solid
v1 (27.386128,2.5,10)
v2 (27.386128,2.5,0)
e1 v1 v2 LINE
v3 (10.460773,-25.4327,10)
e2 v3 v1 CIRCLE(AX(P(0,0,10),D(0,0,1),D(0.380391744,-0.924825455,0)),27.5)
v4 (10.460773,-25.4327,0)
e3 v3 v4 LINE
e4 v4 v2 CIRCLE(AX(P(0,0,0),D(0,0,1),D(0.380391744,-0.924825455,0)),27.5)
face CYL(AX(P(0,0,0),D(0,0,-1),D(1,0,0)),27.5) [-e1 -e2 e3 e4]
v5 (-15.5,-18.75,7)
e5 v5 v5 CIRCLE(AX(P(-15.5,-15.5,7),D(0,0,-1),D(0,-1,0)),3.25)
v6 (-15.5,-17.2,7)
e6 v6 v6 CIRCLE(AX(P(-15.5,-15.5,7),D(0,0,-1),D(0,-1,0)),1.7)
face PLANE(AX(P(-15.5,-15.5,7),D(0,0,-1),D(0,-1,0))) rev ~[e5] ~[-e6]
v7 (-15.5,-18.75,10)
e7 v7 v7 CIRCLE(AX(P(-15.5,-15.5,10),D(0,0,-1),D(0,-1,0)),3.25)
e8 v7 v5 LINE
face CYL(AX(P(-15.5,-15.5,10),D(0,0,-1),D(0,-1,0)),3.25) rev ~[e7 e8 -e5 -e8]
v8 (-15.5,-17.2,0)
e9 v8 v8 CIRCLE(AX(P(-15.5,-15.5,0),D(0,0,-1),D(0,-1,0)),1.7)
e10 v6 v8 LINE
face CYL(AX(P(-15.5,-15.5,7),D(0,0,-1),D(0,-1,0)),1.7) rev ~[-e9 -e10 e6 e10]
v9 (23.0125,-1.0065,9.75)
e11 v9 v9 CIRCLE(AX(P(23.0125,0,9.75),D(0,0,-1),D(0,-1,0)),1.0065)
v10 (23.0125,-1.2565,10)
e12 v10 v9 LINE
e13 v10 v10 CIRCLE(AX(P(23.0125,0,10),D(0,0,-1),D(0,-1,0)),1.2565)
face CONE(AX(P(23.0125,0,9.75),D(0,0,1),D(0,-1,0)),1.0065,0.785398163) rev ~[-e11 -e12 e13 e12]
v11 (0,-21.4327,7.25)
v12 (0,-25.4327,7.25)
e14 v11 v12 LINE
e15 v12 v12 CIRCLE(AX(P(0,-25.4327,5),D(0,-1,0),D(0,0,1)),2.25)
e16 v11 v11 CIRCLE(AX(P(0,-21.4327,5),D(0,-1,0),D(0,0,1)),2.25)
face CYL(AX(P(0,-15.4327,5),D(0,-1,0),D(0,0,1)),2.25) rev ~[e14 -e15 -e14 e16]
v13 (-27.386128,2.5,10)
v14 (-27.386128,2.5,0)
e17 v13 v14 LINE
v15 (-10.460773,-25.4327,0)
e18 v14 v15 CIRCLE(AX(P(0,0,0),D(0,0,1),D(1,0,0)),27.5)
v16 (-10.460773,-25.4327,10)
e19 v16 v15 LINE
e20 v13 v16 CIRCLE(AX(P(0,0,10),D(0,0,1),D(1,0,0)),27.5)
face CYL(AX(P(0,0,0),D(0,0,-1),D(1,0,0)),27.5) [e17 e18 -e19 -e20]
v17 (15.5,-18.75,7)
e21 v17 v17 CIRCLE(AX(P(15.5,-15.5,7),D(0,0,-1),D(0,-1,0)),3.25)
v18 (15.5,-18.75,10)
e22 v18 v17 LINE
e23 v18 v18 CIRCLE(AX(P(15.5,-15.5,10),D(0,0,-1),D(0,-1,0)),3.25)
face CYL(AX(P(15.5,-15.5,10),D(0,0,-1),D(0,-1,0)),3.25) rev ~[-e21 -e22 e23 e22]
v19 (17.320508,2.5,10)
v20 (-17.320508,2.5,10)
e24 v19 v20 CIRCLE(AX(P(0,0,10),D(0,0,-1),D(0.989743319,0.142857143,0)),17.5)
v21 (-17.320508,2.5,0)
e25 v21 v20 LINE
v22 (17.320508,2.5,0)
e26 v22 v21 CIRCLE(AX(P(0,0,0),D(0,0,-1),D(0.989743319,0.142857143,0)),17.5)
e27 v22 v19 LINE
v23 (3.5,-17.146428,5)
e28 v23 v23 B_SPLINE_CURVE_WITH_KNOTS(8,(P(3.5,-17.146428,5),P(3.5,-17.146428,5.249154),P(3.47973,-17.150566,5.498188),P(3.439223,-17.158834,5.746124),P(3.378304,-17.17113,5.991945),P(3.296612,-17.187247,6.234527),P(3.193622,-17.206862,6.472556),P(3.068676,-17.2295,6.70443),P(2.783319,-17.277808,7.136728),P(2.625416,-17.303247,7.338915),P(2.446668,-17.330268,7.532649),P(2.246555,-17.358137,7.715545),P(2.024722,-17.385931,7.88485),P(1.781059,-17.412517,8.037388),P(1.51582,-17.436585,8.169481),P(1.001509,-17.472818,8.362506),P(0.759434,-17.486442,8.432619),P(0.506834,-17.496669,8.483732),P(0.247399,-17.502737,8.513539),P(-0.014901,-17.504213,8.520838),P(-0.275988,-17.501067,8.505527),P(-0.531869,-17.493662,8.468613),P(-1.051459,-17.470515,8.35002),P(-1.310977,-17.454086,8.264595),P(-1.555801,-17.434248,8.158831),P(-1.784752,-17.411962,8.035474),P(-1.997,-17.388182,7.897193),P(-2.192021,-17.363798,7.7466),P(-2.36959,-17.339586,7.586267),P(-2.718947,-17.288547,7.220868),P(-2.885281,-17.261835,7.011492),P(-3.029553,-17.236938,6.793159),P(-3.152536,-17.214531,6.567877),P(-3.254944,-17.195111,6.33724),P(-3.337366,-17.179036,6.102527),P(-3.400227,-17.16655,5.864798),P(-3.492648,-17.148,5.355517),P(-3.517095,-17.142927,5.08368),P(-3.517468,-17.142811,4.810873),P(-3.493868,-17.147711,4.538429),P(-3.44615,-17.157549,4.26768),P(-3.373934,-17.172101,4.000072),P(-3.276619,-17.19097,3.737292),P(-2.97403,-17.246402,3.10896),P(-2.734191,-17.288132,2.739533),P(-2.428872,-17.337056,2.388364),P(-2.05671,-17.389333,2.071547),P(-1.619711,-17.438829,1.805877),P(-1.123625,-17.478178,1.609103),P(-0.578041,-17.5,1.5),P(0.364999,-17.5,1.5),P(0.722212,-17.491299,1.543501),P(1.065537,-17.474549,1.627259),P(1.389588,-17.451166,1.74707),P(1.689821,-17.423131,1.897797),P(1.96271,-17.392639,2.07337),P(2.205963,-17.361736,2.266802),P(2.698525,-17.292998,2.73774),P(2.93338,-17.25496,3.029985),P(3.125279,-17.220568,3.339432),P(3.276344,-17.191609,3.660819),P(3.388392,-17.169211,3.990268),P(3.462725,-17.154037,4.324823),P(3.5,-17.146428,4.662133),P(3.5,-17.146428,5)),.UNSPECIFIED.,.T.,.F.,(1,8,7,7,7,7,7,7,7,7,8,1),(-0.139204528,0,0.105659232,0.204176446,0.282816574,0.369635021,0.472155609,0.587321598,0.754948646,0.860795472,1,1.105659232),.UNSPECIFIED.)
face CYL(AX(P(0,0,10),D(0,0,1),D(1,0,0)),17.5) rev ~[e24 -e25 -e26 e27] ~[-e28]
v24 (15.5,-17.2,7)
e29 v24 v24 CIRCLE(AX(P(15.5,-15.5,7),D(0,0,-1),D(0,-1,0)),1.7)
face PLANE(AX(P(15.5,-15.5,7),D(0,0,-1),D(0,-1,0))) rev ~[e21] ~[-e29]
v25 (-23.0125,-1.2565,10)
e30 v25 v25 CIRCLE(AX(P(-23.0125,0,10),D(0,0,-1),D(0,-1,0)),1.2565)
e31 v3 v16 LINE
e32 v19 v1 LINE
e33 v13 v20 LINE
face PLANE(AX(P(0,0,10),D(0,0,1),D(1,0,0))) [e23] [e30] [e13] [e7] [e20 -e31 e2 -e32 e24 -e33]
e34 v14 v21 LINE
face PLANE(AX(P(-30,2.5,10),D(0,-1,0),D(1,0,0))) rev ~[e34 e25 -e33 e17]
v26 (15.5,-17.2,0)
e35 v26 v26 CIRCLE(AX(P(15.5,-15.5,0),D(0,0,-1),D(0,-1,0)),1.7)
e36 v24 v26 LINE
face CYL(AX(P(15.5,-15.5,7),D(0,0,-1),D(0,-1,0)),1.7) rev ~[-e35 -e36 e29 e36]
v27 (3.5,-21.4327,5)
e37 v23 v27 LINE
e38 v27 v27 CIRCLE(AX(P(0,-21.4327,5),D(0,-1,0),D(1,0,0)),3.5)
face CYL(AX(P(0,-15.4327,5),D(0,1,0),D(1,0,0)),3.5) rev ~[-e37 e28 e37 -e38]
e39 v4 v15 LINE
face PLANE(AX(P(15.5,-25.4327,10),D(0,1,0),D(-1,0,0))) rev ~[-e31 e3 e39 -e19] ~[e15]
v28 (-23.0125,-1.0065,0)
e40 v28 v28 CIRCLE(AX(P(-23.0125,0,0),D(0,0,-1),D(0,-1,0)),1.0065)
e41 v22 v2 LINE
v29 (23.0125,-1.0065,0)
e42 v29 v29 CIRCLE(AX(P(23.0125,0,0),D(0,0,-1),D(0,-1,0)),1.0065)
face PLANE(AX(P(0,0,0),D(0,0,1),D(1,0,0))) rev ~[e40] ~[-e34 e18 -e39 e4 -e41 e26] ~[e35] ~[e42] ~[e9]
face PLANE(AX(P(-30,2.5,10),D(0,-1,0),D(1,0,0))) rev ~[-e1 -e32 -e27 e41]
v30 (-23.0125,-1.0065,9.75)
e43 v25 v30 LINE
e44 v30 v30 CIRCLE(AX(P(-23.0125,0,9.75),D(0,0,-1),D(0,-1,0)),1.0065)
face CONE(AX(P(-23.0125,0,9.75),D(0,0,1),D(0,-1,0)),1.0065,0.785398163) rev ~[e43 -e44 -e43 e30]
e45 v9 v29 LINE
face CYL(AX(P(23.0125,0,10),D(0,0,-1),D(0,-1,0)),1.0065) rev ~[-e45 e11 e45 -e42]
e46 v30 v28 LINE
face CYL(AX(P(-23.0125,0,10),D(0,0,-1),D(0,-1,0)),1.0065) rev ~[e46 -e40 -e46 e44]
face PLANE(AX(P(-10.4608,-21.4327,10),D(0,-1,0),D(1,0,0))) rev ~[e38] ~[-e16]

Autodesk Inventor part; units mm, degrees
ref_plane "YZ Plane" through (0, 0, 0) normal (1, 0, 0) x (0, 1, 0)
ref_plane "XZ Plane" through (0, 0, 0) normal (0, 1, 0) x (-1, 0, 0)
sketch "Sketch2" plane through (0, 0, 0) normal (0, 0, 1) x (1, 0, 0)
  circle A0 centre (0, 0) radius 27.5
  dimension "d44" = 55
extrude "Extrusion1" add sketch "Sketch2" along normal blind 10
sketch "Sketch4" plane through (0, 0, 10) normal (0, 0, 1) x (1, 0, 0)
  point P0 (0, 0)
  point P1 (-15.5, -15.5)
  point P2 (15.5, -15.5)
hole "Hole1" at (-15.5, -15.5, 10) at (15.5, -15.5, 10) direction (0, 0, -1) diameter 3.4 end through all counterbore diameter 6.5 counterbore depth 3 clearance for "Socket Head Cap Screw" size "M3" standard "Ansi Metric M Profile"
sketch "Sketch7" plane through (0, 0, 10) normal (0, 0, 1) x (1, 0, 0)
  circle A0 centre (0, 0) radius 17.5
  dimension "d26" = 35
extrude "Extrusion4" cut sketch "Sketch7" against normal through all
sketch "Sketch8" plane through (0, 0, 10) normal (0, 0, 1) x (1, 0, 0)
  point P0 (-23.0125, 0)
  point P1 (23.0125, 0)
hole "Hole3" at (-23.0125, 0, 10) at (23.0125, 0, 10) direction (0, 0, -1) diameter 2.013 end through all thread size "M2.5x0.45" class "6H" standard "ANSI Metric M Profile"
chamfer "Chamfer1" distance 0.25 angle 45 1 edges at (-23.0125, 1.0065, 10)
chamfer "Chamfer2" distance 0.25 angle 45 1 edges at (23.0125, 1.0065, 10)
sketch "Sketch10" plane through (0, 0, 10) normal (0, 0, 1) x (1, 0, 0)
  line L0 (-15.5, -29.5673) -> (15.5, -29.5673)
  line L1 (15.5, -29.5673) -> (15.5, -25.4327)
  line L2 (15.5, -25.4327) -> (-15.5, -25.4327)
  line L3 (-15.5, -25.4327) -> (-15.5, -29.5673)
  line L4 (-15.5, -29.5673) -> (15.5, -25.4327) construction
  line L5 (15.5, -29.5673) -> (-15.5, -25.4327) construction
  line L6 (-30, 2.5) -> (30, 2.5)
  line L7 (30, 2.5) -> (30, 32.5)
  line L8 (30, 32.5) -> (-30, 32.5)
  line L9 (-30, 32.5) -> (-30, 2.5)
  point P0 (0, -27.5)
  dimension "d63" = 60
  dimension "d64" = 30
extrude "Extrusion6" cut sketch "Sketch10" against normal through all
ref_plane "Work Plane1" through (-10.4608, -15.4327, 10) normal (0, -1, 0) x (1, 0, 0)
sketch "Sketch13" plane through (-10.4608, -15.4327, 10) normal (0, -1, 0) x (1, 0, 0)
  point P0 (10.4608, -10)
  point P1 (10.4608, -5)
hole "Hole5" at (0, -15.4327, 5) direction (0, -1, 0) diameter 4.5 end through all clearance for "Hex Head Machine Screw" size "M4" standard "Ansi Metric M Profile"
sketch "Sketch14" plane through (-10.4608, -15.4327, 10) normal (0, -1, 0) x (1, 0, 0)
  circle A0 centre (10.4608, -5) radius 3.5
  point P0 (10.4608, -10)
  dimension "d73" = 7
extrude "Extrusion7" cut sketch "Sketch14" along normal blind 6
properties part number "Mount" material "Bronze, Soft Tin"
